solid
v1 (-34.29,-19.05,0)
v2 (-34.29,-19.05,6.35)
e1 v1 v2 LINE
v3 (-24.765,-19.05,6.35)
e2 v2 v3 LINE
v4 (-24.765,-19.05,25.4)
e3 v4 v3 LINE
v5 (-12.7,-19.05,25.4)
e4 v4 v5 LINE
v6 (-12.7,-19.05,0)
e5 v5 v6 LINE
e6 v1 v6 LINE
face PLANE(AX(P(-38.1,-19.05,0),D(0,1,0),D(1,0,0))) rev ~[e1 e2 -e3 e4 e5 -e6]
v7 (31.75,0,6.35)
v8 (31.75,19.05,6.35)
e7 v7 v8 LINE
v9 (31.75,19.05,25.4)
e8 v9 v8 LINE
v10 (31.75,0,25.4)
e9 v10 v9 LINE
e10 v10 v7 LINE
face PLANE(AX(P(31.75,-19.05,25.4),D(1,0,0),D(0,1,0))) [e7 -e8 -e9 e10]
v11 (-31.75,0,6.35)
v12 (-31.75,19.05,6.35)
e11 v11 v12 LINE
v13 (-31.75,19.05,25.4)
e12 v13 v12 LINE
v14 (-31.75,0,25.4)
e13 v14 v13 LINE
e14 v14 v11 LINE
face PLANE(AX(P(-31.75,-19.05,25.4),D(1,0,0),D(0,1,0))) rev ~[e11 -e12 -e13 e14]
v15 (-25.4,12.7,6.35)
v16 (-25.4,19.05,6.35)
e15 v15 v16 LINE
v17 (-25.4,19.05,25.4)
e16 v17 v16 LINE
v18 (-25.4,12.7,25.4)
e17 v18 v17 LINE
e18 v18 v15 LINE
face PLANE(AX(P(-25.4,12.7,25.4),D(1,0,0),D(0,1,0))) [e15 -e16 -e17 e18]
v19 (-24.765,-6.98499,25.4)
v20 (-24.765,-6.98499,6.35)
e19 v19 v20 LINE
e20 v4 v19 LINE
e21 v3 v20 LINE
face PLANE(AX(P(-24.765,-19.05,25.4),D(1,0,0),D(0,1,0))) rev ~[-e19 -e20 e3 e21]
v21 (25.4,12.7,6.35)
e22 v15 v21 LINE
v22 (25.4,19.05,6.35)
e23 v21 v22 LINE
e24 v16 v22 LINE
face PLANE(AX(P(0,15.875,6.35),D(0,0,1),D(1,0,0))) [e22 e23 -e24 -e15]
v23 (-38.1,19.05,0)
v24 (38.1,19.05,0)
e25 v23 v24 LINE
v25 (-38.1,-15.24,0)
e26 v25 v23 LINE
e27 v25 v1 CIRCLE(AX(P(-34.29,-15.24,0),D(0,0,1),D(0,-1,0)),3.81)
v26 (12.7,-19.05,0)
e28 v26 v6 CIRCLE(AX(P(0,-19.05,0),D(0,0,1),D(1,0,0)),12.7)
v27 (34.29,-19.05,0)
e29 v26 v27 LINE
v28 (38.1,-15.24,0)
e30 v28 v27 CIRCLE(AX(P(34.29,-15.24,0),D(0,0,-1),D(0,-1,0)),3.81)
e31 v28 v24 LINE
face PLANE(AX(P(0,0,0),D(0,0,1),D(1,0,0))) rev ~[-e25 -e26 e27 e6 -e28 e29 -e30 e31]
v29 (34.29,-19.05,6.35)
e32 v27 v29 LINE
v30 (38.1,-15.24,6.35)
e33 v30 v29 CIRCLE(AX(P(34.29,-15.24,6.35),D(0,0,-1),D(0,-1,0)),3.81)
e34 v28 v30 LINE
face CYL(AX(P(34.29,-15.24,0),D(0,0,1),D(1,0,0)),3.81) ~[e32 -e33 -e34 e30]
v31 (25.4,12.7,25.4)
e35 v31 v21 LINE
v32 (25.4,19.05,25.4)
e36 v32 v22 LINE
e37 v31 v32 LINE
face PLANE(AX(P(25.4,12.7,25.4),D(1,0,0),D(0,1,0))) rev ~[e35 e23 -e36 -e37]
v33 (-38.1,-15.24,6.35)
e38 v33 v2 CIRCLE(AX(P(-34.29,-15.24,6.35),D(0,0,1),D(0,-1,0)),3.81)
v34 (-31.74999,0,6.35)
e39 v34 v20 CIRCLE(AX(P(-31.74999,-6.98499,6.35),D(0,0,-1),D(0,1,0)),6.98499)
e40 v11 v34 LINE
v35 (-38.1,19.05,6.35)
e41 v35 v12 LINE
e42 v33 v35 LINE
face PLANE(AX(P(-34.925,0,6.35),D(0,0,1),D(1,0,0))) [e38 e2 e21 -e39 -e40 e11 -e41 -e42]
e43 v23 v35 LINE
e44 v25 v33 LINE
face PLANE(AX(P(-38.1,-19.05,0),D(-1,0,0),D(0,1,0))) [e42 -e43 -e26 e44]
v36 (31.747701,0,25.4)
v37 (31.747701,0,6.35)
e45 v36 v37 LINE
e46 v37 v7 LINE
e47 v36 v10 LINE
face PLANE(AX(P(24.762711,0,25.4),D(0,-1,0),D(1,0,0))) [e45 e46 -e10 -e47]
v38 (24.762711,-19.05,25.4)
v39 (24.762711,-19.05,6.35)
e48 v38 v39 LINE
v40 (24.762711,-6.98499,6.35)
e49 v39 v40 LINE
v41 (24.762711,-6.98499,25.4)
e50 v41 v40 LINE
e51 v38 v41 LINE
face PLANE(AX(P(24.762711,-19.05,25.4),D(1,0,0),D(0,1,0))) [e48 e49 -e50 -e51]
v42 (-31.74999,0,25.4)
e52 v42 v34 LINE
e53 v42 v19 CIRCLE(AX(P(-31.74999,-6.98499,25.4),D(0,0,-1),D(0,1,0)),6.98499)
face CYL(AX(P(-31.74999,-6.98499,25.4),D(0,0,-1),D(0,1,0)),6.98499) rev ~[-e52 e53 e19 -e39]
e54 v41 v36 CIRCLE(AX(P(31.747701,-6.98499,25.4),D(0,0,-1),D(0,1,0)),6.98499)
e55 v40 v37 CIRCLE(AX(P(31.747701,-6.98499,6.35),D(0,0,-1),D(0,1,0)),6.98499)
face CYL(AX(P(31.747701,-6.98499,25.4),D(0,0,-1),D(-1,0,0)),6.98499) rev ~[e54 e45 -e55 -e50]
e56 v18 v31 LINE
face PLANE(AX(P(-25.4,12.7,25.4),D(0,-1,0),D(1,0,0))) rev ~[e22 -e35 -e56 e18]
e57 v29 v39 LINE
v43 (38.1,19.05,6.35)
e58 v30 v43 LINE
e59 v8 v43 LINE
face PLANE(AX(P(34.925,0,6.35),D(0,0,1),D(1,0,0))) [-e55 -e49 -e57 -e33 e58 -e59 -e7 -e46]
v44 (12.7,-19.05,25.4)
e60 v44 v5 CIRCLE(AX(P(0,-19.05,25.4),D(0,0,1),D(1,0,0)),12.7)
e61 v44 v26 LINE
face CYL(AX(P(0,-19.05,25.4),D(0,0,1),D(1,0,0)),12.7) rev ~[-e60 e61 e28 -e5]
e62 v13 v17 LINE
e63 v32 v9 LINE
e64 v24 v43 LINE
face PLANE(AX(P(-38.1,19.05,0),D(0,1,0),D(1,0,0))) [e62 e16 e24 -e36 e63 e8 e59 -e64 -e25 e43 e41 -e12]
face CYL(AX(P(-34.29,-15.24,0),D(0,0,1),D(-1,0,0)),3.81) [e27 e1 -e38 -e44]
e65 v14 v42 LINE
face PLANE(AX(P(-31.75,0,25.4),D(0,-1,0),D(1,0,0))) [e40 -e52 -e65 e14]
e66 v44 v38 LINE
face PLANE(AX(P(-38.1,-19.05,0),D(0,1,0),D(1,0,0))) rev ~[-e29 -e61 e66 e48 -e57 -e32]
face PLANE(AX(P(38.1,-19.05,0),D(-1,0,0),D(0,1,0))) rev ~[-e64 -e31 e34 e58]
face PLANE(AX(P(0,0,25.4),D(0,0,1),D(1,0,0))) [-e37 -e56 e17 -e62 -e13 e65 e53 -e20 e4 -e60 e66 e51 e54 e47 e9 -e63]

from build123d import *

# Parameters (mm, degrees)
F0_W      = 76.2
F0_H      = 38.1
F1_DEPTH  = 25.4
F2_W      = 50.8
F2_H      = 6.35
F3_DEPTH  = 19.05
F4_W      = 6.35
F4_H      = 38.1
F5_DEPTH  = 19.05
F7_DEPTH  = 25.4
F8_R      = 3.81
F9_W      = 6.985
F9_H      = 19.05
F9_W_2    = 6.9872894436
F10_DEPTH = 19.05
F11_R     = 6.98499


# Not quite as in the source:
# - a fillet or chamfer is up to 0.001 mm smaller than in the source, because OpenCascade refuses the exact size
# - a feature of the source that left no trace in its solid (it failed there, or was rolled back) is left out


with BuildPart() as f1:
    # F0 (on Top) → F1 (new body)
    with BuildSketch(Plane.XY):
        Rectangle(F0_W, F0_H)
    extrude(amount=F1_DEPTH)

    # F2 (on face) → F3 (cut)
    with BuildSketch(Plane.XY.offset(25.4)):
        with Locations((0, 15.875)):
            Rectangle(F2_W, F2_H)
    extrude(amount=-F3_DEPTH, mode=Mode.SUBTRACT)

    # F4 (on face) → F5 (cut)
    with BuildSketch(Plane.XY.offset(25.4)):
        with Locations((-34.925, 0)):
            Rectangle(F4_W, F4_H)
        with Locations((34.925, 0)):
            Rectangle(F4_W, F4_H)
    extrude(amount=-F5_DEPTH, mode=Mode.SUBTRACT)

    # F6 (on face) → F7 (cut)
    with BuildSketch(Plane.XY.offset(25.4)):
        with BuildLine():
            Line((-12.7, -19.05), (12.7, -19.05))
            ThreePointArc((12.7, -19.05), (0, -6.35), (-12.7, -19.05))
        make_face()
    extrude(amount=-F7_DEPTH, mode=Mode.SUBTRACT)

    # F8
    f8_edges = [f1.edges().sort_by_distance(p)[0] for p in [
        (38.1, -19.05, 3.175),
        (-38.1, -19.05, 3.175),
    ]]
    fillet(f8_edges, radius=F8_R)

    # F9 (on face) → F10 (cut)
    with BuildSketch(Plane.XY.offset(25.4)):
        with Locations((-28.2575, -9.525)):
            Rectangle(F9_W, F9_H)
        with Locations((28.2563552782, -9.525)):
            Rectangle(F9_W_2, F9_H)
    extrude(amount=-F10_DEPTH, mode=Mode.SUBTRACT)

    # F11 (radius 6.985 in the source; OpenCascade refuses exactly that, so slightly less here)
    f11_edges = [f1.edges().sort_by_distance(p)[0] for p in [
        (24.762711, 0, 15.875),
        (-24.765, 0, 15.875),
    ]]
    fillet(f11_edges, radius=F11_R)


solid = f1.part
